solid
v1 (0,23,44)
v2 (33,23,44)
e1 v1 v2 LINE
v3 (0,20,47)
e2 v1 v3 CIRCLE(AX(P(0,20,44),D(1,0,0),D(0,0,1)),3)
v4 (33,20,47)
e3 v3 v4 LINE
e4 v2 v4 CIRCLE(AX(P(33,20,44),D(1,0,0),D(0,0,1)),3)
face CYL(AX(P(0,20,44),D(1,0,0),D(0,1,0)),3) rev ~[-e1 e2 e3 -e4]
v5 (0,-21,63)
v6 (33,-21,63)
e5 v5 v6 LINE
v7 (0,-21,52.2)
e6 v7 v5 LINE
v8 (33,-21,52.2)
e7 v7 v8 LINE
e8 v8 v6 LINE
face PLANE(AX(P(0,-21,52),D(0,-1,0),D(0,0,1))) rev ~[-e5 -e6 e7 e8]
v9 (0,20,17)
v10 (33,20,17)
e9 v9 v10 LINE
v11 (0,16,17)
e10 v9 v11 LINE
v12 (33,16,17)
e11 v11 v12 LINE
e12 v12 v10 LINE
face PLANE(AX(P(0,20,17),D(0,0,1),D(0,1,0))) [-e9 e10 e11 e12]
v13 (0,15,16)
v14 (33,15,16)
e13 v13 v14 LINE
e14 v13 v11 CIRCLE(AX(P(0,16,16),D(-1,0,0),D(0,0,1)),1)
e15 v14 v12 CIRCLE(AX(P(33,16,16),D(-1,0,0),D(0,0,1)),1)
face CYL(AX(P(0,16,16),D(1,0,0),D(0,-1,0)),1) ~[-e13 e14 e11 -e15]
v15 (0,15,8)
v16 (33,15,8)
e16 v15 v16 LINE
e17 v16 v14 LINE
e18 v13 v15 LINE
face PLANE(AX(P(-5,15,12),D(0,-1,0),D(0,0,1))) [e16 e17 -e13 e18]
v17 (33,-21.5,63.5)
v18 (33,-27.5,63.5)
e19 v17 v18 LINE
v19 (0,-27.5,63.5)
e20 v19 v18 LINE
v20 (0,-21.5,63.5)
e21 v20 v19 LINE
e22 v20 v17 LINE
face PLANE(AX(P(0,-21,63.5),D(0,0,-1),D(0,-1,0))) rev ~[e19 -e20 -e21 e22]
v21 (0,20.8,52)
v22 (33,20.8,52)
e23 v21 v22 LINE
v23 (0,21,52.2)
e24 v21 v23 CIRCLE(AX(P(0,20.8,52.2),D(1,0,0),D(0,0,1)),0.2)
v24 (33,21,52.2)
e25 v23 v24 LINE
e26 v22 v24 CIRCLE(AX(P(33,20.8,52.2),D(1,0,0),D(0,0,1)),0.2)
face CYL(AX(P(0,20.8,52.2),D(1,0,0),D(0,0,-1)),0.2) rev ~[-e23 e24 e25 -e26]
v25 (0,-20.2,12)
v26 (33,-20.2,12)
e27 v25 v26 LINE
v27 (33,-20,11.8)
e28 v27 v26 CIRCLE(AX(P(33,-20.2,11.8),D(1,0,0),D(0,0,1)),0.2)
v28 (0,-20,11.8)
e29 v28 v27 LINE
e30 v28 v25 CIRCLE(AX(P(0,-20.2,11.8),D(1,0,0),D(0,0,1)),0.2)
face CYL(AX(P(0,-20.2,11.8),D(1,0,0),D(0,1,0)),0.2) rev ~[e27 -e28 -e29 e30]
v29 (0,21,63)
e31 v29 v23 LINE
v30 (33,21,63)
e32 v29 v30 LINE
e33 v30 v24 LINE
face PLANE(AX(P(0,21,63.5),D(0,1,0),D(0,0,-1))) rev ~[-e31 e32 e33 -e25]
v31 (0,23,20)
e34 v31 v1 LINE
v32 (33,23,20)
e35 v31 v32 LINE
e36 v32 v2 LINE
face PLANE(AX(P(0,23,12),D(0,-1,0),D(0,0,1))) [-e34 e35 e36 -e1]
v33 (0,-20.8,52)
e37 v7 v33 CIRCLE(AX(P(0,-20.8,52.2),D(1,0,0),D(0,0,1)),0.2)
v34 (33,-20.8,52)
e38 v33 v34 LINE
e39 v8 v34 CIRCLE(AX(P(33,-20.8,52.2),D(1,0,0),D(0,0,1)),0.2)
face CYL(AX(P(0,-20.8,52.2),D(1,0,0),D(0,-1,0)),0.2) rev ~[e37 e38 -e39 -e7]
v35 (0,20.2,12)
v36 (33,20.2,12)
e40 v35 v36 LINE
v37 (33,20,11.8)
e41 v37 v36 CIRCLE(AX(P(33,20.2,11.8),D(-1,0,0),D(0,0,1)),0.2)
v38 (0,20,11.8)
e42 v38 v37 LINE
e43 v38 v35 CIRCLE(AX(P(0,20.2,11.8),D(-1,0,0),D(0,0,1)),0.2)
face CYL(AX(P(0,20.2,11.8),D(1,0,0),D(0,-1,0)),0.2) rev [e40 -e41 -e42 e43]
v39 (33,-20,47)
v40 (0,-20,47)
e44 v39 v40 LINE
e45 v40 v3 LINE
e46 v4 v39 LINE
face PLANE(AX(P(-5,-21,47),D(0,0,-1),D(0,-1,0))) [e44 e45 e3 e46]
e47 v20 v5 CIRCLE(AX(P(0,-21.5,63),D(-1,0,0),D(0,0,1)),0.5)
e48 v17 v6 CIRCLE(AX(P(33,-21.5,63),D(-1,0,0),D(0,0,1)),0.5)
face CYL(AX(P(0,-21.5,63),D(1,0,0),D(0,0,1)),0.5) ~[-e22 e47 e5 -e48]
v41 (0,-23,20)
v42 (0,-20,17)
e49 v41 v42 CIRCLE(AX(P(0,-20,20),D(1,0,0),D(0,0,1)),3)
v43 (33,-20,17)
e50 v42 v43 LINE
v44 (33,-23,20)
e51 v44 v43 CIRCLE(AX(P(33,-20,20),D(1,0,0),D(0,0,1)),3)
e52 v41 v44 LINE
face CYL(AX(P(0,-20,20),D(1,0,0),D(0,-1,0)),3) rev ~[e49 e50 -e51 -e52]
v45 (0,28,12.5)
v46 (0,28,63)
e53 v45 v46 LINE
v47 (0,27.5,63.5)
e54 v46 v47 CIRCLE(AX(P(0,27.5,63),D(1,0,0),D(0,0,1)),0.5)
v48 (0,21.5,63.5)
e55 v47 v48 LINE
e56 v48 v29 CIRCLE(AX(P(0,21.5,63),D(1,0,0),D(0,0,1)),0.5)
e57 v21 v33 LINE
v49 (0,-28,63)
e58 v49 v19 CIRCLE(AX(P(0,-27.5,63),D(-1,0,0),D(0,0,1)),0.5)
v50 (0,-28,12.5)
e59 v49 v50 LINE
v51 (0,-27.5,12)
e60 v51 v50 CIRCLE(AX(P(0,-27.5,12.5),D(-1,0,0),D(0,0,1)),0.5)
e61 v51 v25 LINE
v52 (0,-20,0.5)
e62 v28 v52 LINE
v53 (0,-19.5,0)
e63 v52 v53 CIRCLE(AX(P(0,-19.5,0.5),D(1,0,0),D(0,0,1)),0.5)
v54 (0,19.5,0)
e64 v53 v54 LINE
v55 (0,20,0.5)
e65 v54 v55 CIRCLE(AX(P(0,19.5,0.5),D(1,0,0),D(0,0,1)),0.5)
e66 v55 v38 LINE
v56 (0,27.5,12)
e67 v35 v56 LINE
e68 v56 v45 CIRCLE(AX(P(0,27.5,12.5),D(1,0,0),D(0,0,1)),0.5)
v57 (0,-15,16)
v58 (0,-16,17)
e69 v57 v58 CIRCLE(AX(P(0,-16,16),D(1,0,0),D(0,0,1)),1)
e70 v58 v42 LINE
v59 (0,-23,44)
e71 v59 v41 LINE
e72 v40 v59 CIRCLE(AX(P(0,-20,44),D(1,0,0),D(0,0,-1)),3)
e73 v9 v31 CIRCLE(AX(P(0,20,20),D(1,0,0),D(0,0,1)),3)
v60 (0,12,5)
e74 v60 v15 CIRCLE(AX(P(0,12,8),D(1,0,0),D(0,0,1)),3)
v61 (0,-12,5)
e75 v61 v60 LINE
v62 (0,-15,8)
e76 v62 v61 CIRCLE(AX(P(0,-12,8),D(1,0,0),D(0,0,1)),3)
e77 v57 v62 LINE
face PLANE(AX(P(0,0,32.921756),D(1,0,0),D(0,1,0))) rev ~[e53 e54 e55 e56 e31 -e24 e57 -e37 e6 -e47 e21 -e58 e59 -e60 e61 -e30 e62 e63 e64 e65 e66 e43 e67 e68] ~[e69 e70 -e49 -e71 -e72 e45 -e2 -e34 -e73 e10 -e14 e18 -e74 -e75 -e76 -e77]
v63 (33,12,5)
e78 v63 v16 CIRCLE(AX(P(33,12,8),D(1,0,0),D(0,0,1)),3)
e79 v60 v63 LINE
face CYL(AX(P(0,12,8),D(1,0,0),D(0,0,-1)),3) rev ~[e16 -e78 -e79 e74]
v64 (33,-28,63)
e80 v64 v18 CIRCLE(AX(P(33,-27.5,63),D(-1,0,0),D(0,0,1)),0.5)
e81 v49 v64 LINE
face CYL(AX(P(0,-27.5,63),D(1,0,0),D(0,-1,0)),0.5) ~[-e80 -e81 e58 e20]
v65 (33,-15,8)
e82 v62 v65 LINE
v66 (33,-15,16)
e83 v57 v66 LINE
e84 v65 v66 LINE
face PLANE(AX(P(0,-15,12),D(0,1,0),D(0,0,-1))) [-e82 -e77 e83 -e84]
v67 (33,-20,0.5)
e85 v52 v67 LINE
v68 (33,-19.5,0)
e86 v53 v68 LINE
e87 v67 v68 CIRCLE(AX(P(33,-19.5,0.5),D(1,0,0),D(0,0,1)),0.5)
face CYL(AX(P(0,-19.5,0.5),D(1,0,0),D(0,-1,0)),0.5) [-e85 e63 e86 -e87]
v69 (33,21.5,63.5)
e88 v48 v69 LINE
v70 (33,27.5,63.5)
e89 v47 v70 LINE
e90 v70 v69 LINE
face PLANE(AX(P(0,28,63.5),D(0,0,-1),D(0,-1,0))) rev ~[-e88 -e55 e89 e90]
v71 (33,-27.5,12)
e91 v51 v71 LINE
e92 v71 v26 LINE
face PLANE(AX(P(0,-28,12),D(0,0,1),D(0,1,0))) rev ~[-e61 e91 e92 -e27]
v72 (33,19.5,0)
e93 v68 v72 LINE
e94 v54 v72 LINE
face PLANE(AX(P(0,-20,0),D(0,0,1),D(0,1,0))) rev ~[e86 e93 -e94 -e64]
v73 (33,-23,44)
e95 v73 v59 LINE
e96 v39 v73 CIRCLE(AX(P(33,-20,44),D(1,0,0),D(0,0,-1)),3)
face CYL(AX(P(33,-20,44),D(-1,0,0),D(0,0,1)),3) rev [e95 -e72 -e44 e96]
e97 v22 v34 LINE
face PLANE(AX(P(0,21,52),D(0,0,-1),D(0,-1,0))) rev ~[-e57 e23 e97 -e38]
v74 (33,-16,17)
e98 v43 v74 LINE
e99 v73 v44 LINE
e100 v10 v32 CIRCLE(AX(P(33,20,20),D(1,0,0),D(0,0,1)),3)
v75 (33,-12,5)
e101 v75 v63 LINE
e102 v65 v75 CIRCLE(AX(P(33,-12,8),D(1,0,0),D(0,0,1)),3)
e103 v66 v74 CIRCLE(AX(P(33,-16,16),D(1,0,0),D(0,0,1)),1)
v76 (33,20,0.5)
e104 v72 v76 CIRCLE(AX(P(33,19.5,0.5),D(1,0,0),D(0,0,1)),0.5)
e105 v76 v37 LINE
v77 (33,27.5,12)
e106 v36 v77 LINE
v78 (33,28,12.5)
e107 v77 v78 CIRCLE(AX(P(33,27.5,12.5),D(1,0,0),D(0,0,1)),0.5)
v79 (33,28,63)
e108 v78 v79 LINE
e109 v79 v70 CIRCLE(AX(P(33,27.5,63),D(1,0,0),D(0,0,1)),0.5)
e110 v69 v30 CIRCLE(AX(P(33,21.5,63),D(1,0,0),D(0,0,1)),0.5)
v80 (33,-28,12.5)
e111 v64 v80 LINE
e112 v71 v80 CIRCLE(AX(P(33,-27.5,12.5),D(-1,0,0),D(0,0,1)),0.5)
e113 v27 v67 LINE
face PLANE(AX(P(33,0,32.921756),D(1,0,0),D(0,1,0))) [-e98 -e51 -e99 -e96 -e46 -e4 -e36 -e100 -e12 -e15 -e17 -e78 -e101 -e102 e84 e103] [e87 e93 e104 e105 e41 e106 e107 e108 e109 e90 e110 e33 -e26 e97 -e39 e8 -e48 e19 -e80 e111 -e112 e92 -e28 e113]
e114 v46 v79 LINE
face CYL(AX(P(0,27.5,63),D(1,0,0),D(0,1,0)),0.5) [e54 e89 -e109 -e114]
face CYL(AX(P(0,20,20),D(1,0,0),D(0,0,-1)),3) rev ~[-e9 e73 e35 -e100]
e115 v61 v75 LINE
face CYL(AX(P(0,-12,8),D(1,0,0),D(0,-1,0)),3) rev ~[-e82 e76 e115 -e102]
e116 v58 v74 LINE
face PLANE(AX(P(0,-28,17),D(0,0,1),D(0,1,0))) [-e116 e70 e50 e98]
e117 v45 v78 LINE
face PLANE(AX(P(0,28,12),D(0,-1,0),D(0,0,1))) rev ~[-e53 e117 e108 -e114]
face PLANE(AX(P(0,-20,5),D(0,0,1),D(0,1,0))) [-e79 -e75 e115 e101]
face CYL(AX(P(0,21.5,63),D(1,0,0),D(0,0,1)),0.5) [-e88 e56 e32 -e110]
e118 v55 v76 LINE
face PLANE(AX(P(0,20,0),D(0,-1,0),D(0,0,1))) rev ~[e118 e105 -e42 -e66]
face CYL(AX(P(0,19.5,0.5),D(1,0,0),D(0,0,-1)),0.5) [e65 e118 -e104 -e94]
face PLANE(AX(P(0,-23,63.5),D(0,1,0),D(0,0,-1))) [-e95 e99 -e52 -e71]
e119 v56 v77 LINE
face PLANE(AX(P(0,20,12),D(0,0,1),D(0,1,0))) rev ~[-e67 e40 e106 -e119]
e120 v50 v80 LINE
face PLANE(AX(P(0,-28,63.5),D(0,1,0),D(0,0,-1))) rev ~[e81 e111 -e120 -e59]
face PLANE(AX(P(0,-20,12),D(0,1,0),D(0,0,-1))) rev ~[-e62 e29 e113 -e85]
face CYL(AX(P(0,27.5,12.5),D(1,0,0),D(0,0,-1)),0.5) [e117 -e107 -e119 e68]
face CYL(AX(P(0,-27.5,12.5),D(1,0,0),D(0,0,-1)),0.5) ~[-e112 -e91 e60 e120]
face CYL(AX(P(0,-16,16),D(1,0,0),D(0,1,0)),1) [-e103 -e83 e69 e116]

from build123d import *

# Parameters (mm, degrees)
F1_DEPTH    = 33
F2_T        = 5
F2_T3_DEPTH = 43
F3_R        = 0.2
F4_R        = 0.5
F5_R        = 3
F6_R        = 1


# Not quite as in the source:
# - a shell that OpenCascade refuses in one call is made with other operations: the cavity is built on its own and cut out


with BuildPart() as f1:
    # F0 (on Right) → F1 (new body)
    with BuildSketch(Plane.YZ):
        Polygon((-20, 12), (-20, 0), (20, 0), (20, 12), (28, 12), (28, 63.5), (21, 63.5), (21, 52), (-21, 52), (-21, 63.5), (-28, 63.5), (-28, 12), align=None)
    extrude(amount=F1_DEPTH)

    # F2: shell of thickness 5, made by hand


with BuildPart() as f2_core1:
    # F2_t2: copy of F1
    add(f1.part)

    # the walls: a layer under each face that stays
    f2_faces = [f2_core1.faces().sort_by_distance(p)[0] for p in [
        (16.5, -20, 6),
        (16.5, 0, 0),
        (16.5, 20, 6),
        (16.5, 24, 12),
        (16.5, 28, 37.75),
        (16.5, 24.5, 63.5),
        (16.5, 21, 57.75),
        (16.5, 0, 52),
        (16.5, -21, 57.75),
        (16.5, -24.5, 63.5),
        (16.5, -28, 37.75),
        (16.5, -24, 12),
    ]]
    thicken(f2_faces, amount=-F2_T, mode=Mode.SUBTRACT)

    # F2_s4 → F2_t3 (cut)
    with BuildSketch(Plane.YZ.offset(-5)):
        Polygon((-20.05, 11.95), (-15, 12), (-15, 17), (-20, 17), align=None)
        Polygon((20.05, 11.95), (15, 12), (15, 17), (20, 17), align=None)
        Polygon((20.95, 52.05), (26, 52), (26, 47), (21, 47), align=None)
        Polygon((-20.95, 52.05), (-21, 47), (-26, 47), (-26, 52), align=None)
    extrude(amount=F2_T3_DEPTH, mode=Mode.SUBTRACT)


with BuildPart() as f1_1:
    add(f1.part)

    # what is left inside the walls is the cavity
    f2_cavity = [f2_core1.part.solids().sort_by_distance(p)[0] for p in [
        (32.95, 0, 19),
    ]]
    add(f2_cavity, mode=Mode.SUBTRACT)

    # F3
    f3_edges = [f1_1.edges().sort_by_distance(p)[0] for p in [
        (16.5, 20, 12),
        (16.5, -20, 12),
        (16.5, -21, 52),
        (16.5, 21, 52),
    ]]
    fillet(f3_edges, radius=F3_R)

    # F4
    f4_edges = [f1_1.edges().sort_by_distance(p)[0] for p in [
        (16.5, 21, 63.5),
        (16.5, 28, 63.5),
        (16.5, 28, 12),
        (16.5, 20, 0),
        (16.5, -20, 0),
        (16.5, -28, 12),
        (16.5, -28, 63.5),
        (16.5, -21, 63.5),
    ]]
    fillet(f4_edges, radius=F4_R)

    # F5
    f5_edges = [f1_1.edges().sort_by_distance(p)[0] for p in [
        (16.5, -23, 17),
        (16.5, 23, 17),
        (16.5, 15, 5),
        (16.5, -15, 5),
        (16.5, 23, 47),
        (16.5, -23, 47),
    ]]
    fillet(f5_edges, radius=F5_R)

    # F6
    f6_edges = [f1_1.edges().sort_by_distance(p)[0] for p in [
        (16.5, -15, 17),
        (16.5, 15, 17),
    ]]
    fillet(f6_edges, radius=F6_R)


solid = f1_1.part
